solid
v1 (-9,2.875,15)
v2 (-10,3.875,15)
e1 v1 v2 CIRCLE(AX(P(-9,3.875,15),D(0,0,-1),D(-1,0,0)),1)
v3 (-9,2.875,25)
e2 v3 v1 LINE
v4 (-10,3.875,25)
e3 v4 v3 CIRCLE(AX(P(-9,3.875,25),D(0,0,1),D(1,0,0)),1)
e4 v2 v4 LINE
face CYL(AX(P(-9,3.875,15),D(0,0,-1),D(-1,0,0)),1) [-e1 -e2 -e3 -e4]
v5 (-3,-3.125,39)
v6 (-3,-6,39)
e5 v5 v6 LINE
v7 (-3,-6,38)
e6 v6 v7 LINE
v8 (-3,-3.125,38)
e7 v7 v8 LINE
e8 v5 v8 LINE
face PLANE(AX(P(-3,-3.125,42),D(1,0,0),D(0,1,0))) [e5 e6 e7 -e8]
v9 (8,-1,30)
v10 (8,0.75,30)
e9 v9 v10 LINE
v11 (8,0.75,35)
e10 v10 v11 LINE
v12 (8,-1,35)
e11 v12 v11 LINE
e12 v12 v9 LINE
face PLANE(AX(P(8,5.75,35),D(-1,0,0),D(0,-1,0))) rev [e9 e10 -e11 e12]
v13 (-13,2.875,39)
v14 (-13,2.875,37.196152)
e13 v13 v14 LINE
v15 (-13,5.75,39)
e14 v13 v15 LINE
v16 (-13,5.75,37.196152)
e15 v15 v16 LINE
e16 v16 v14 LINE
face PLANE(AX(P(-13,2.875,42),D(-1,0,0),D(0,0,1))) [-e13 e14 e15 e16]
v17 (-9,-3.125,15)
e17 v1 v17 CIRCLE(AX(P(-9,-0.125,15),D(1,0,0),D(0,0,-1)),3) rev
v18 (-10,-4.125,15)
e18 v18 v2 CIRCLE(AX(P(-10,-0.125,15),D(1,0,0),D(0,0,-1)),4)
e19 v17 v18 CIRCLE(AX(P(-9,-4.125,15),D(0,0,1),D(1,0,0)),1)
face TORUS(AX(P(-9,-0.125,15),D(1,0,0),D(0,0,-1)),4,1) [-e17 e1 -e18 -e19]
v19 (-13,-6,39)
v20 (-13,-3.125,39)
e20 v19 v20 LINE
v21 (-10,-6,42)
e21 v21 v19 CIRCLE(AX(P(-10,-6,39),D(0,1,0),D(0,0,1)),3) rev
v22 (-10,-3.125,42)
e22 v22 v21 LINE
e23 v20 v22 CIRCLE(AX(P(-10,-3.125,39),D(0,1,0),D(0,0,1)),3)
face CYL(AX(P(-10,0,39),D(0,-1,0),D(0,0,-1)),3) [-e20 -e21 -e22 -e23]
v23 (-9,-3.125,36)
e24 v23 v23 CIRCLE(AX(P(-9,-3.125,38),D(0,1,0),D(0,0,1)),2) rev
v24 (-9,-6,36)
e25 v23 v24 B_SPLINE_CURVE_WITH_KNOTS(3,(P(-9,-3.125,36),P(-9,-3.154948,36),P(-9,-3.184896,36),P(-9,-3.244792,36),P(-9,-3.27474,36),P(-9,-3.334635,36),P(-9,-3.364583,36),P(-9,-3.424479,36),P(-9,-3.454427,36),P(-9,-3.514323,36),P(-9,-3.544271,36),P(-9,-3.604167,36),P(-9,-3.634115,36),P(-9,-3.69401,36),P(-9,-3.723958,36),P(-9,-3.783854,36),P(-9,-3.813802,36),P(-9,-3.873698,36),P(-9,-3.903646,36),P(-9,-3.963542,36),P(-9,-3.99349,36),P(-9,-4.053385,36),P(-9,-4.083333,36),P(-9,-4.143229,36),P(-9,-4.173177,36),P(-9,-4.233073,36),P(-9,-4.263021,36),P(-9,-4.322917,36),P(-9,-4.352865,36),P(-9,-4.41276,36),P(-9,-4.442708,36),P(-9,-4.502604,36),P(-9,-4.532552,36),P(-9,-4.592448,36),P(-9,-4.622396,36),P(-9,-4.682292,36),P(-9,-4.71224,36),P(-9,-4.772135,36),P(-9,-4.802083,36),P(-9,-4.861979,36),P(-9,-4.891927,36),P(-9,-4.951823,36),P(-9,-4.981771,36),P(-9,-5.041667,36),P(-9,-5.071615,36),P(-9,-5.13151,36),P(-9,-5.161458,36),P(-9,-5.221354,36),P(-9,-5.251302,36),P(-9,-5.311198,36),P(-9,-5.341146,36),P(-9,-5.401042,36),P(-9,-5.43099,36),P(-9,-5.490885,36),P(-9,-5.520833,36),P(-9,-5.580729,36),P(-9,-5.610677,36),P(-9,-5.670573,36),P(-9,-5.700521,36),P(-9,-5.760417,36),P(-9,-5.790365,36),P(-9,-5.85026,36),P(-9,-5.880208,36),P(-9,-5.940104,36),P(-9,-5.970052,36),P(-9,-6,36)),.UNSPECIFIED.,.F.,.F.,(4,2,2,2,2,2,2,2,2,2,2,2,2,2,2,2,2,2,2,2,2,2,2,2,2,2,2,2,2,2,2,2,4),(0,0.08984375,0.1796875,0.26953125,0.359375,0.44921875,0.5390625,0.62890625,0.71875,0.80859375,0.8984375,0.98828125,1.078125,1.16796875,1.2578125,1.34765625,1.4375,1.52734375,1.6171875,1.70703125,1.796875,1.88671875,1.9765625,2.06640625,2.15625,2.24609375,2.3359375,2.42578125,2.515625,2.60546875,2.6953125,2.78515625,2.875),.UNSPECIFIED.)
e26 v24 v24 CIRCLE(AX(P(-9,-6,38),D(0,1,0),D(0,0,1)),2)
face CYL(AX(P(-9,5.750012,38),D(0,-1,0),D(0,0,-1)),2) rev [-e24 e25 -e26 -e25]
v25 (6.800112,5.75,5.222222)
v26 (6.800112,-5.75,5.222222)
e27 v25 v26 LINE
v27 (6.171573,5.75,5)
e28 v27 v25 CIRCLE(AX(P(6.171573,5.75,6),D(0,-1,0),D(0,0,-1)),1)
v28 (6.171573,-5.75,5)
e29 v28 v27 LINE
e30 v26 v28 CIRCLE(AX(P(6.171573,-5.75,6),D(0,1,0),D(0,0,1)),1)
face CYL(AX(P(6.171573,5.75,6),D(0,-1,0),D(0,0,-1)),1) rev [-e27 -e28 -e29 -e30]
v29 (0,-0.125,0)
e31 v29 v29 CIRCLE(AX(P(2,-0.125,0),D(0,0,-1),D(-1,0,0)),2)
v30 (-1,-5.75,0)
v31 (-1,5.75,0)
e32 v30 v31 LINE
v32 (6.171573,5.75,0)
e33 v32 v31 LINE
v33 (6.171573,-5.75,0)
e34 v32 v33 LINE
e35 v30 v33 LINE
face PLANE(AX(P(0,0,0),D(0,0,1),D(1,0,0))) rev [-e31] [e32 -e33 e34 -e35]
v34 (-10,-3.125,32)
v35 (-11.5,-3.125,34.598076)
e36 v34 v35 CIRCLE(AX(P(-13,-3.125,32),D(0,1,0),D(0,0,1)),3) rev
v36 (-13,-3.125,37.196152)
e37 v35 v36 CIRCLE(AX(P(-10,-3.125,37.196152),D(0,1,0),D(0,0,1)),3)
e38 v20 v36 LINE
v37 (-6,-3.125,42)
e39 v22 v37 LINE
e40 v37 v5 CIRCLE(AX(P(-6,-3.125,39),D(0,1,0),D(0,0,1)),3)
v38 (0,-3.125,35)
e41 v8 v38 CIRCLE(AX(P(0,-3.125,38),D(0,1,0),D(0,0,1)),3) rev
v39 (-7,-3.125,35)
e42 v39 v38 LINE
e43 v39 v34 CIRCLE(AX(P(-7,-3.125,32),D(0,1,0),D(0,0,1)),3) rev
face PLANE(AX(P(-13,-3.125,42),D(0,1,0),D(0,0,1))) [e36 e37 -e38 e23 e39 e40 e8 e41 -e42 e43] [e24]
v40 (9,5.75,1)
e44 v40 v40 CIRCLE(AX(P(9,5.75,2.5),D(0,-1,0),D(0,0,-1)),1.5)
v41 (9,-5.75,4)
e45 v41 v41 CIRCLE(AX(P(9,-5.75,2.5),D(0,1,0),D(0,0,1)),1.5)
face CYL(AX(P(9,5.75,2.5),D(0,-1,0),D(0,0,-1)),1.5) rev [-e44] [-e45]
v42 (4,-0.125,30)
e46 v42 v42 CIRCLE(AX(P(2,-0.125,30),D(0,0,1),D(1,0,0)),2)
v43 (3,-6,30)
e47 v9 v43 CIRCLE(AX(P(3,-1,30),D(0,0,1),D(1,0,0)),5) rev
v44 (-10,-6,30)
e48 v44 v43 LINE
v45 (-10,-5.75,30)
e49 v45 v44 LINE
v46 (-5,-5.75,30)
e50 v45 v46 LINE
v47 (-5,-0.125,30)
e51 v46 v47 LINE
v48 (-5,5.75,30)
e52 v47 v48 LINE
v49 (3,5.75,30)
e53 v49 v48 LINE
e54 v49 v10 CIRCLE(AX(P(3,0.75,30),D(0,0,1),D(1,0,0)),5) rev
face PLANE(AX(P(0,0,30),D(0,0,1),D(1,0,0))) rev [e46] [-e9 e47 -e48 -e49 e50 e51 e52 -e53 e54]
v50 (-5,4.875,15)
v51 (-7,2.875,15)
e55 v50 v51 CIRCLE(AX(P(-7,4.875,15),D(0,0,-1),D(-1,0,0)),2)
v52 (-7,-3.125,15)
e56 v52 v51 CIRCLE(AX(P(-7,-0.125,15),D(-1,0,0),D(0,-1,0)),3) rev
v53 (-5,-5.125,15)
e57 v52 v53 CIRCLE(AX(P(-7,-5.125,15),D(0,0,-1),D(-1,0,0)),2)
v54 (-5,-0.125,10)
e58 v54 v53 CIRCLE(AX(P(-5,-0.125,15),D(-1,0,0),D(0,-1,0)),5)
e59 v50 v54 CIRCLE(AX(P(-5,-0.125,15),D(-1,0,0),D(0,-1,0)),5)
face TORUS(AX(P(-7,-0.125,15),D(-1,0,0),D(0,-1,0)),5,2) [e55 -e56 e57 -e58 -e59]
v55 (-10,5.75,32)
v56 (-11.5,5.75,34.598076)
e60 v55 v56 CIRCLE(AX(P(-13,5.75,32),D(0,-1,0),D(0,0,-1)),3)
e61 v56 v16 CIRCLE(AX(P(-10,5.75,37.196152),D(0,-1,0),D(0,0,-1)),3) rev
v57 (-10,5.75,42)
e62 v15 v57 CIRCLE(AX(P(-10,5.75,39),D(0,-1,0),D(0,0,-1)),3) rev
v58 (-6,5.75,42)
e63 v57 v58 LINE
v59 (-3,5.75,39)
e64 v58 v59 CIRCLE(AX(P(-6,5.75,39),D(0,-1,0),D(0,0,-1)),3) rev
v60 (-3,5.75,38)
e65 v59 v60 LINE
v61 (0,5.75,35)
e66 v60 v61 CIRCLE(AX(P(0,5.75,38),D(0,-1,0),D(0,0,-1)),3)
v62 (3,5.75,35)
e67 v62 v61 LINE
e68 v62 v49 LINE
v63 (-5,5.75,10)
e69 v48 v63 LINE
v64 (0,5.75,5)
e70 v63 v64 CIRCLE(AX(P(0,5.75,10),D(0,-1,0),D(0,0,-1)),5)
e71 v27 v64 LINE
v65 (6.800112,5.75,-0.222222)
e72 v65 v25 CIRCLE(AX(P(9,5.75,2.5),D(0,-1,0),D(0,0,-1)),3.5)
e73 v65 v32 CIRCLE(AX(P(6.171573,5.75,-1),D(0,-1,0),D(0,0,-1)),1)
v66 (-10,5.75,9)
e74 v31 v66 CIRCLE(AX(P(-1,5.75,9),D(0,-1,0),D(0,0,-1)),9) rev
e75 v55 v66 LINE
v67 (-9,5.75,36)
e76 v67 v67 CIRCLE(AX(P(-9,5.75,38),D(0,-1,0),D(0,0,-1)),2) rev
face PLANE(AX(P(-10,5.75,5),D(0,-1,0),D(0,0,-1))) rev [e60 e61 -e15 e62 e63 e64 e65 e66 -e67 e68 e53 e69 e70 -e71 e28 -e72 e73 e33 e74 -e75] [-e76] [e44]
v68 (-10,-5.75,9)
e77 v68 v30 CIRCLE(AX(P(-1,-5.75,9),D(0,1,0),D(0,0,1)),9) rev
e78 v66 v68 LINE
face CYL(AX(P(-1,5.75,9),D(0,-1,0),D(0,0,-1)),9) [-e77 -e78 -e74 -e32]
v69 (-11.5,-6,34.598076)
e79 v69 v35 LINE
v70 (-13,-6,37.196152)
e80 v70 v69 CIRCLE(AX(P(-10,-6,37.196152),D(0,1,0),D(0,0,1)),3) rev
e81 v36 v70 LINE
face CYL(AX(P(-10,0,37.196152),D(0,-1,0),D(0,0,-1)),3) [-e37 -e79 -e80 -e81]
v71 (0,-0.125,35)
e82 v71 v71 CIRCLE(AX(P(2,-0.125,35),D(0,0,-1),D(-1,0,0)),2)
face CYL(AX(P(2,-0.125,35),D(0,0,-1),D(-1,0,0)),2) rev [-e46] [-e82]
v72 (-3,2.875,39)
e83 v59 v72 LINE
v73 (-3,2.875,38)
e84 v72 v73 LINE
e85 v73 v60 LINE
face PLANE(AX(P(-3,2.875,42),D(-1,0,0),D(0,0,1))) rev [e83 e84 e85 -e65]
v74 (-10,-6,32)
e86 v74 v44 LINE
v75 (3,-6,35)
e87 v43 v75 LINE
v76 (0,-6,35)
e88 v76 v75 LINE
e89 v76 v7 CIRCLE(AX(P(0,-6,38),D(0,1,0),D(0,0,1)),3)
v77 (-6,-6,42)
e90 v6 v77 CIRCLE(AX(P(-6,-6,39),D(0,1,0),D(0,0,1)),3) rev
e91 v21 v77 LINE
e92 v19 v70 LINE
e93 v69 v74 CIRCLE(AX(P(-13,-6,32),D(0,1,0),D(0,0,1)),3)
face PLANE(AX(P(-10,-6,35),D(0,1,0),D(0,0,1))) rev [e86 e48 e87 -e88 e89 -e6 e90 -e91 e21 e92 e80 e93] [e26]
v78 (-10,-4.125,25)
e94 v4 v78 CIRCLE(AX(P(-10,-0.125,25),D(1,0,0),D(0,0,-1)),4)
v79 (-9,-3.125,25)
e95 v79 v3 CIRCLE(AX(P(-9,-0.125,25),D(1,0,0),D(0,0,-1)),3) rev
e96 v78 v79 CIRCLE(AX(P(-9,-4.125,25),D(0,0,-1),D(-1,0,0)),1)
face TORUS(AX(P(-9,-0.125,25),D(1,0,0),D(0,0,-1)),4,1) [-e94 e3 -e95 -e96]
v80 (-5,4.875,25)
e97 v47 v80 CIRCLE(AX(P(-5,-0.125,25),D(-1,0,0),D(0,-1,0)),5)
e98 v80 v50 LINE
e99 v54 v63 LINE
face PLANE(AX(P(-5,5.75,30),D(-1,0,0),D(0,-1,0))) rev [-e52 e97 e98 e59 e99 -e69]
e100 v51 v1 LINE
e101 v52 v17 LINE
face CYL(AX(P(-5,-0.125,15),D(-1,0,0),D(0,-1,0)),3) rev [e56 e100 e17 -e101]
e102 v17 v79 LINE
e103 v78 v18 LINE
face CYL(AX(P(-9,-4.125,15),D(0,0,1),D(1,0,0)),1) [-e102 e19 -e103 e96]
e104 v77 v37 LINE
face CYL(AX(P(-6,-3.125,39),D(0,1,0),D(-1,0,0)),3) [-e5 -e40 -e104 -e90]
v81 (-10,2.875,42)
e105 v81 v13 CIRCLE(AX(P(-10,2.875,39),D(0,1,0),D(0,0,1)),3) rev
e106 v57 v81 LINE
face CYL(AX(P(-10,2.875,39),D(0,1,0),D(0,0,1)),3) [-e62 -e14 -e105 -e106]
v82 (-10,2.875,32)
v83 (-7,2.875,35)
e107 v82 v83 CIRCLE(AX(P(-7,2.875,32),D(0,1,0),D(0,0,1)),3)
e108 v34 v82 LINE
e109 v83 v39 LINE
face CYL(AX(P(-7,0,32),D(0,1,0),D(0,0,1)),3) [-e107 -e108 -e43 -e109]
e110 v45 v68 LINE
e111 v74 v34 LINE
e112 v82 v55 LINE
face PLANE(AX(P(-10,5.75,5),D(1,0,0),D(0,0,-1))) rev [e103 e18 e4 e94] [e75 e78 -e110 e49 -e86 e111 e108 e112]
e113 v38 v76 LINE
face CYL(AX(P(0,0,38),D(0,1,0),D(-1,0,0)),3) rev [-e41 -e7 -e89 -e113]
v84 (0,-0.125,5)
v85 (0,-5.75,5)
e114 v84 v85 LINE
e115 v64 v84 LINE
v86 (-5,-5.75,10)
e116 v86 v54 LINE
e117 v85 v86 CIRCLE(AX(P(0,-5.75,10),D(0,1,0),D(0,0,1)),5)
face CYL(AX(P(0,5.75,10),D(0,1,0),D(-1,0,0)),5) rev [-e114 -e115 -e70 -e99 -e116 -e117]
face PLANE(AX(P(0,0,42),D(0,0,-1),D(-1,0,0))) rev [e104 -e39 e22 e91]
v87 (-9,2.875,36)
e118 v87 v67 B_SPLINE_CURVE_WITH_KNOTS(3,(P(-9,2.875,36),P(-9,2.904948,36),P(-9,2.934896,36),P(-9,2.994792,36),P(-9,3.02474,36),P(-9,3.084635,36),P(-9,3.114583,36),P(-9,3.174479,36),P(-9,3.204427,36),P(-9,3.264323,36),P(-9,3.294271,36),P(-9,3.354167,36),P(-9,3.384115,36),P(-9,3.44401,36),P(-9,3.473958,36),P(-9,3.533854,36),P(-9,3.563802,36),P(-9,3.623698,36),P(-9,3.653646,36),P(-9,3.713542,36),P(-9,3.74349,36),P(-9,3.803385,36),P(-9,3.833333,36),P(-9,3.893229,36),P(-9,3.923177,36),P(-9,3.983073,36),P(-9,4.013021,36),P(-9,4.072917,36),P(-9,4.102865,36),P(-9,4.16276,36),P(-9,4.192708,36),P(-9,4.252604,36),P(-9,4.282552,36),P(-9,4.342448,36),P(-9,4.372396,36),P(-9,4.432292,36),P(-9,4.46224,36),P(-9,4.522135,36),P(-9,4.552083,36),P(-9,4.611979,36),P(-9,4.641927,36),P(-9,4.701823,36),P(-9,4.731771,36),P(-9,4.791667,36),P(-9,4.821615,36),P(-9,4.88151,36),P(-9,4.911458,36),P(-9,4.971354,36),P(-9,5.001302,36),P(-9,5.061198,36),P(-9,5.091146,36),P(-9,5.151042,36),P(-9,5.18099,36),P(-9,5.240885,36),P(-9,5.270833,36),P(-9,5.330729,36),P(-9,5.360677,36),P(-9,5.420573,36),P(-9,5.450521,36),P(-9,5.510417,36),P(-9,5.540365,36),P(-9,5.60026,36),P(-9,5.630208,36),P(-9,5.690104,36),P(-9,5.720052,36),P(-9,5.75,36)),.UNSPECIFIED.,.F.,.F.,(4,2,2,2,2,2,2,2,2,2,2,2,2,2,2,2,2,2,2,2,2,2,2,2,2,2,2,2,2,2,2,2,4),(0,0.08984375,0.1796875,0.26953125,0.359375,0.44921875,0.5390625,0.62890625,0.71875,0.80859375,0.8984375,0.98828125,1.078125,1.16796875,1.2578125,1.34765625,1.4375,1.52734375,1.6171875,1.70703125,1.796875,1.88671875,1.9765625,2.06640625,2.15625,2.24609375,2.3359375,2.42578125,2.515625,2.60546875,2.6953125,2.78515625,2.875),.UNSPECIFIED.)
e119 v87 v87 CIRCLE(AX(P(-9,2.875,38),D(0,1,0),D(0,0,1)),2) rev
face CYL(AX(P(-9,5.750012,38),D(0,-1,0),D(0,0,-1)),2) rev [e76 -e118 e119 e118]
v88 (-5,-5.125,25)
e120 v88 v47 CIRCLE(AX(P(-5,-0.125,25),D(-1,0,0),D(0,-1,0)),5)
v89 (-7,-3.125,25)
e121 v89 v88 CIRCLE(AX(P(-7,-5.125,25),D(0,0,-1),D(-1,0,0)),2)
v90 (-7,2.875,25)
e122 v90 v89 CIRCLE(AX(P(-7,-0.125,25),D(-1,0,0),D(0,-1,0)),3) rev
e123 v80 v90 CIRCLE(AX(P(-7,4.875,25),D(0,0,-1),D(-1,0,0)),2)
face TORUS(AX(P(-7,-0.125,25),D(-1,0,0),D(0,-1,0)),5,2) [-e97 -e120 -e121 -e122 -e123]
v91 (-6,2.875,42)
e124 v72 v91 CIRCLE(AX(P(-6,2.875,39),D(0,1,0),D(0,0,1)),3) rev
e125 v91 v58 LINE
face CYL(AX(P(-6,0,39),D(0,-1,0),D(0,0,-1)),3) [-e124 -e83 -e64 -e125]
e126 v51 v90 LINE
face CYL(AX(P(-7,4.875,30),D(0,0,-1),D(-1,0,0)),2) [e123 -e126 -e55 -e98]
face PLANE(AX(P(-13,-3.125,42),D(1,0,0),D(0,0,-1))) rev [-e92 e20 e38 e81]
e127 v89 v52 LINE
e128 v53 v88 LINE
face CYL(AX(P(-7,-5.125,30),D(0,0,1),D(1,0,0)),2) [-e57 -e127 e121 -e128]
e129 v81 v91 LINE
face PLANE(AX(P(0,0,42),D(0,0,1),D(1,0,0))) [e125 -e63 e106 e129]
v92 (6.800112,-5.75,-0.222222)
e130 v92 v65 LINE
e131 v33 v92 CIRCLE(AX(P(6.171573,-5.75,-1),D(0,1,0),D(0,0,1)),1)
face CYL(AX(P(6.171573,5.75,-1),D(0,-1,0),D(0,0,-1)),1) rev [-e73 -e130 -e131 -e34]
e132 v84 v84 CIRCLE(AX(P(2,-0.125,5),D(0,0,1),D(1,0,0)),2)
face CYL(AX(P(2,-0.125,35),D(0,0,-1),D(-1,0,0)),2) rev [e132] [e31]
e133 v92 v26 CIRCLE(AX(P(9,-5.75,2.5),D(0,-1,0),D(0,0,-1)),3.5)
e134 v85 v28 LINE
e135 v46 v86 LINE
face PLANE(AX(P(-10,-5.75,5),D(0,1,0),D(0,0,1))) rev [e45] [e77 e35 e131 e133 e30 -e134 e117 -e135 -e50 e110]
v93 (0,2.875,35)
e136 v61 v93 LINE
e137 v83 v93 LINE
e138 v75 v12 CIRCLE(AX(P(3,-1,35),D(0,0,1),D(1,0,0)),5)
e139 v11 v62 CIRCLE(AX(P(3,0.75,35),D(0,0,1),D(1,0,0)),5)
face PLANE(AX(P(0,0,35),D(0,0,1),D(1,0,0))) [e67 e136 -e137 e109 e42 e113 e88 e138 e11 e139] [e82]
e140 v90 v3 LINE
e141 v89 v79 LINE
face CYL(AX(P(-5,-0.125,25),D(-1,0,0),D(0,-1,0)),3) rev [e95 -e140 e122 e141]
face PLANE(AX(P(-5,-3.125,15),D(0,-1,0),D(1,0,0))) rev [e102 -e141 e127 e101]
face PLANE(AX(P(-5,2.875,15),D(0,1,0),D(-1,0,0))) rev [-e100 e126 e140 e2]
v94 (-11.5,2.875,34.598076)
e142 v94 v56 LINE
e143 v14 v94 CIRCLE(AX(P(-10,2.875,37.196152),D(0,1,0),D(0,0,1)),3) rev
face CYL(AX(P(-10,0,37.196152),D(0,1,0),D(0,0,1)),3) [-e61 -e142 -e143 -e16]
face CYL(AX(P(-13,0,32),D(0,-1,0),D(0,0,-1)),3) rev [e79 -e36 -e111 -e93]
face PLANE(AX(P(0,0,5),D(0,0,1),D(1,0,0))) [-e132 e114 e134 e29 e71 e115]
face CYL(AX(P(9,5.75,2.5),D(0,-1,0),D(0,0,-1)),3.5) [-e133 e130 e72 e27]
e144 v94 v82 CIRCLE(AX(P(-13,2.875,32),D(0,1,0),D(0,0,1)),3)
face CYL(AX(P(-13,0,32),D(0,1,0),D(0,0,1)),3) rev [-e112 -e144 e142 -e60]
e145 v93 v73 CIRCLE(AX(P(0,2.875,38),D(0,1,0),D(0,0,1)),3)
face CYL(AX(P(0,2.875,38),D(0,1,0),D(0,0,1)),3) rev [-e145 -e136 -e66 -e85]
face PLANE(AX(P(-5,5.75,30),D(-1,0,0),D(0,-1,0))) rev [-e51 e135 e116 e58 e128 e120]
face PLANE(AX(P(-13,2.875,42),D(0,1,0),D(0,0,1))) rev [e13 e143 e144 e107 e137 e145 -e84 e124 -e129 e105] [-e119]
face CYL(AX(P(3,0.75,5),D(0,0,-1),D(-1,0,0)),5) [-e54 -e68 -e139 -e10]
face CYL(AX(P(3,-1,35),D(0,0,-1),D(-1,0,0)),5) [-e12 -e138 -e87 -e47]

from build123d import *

# Parameters (mm, degrees)
SKETCH1_W               = 20
SKETCH1_H               = 11.5
BOSS_EXTRUDE1_DEPTH     = 5
SKETCH2_W               = 5
SKETCH2_H               = 11.5
BOSS_EXTRUDE2_DEPTH     = 25
SKETCH3_W               = 18
SKETCH3_H               = 11.75
BOSS_EXTRUDE3_DEPTH     = 5
CUT_EXTRUDE1_DEPTH      = 5
CUT_EXTRUDE2_DEPTH      = 33.186953879
CUT_EXTRUDE2_DEPTH_BACK = 33.186953879
SKETCH5_R               = 2
FILLET1_R               = 9
FILLET7_R               = 5
FILLET8_R               = 1
FILLET9_R               = 2
CUT_EXTRUDE4_DEPTH      = 39.173943993
CUT_EXTRUDE4_DEPTH_BACK = 39.173943993
SKETCH10_R              = 1.5
SKETCH10_4_R            = 3.5
SKETCH10_4_R_2          = 1.5
BOSS_EXTRUDE7_DEPTH     = 11.5
FILLET13_R              = 1
FILLET16_R              = 5
SKETCH11_W              = 10
SKETCH11_H              = 2.875
BOSS_EXTRUDE8_DEPTH     = 7
CUT_EXTRUDE5_DEPTH      = 46.508927696
CUT_EXTRUDE5_DEPTH_BACK = 46.508927696
SKETCH12_R              = 2
FILLET17_R              = 3
FILLET18_R              = 3
FILLET19_R              = 3


with BuildPart() as part:
    # Sketch1 → Boss-Extrude1 (new body)
    with BuildSketch(Plane.XY):
        Rectangle(SKETCH1_W, SKETCH1_H)
    extrude(amount=BOSS_EXTRUDE1_DEPTH)

    # Sketch2 → Boss-Extrude2 (add)
    with BuildSketch(Plane.XY.offset(5)):
        with Locations((-7.5, 0)):
            Rectangle(SKETCH2_W, SKETCH2_H)
    extrude(amount=BOSS_EXTRUDE2_DEPTH)

    # Sketch3 → Boss-Extrude3 (add)
    with BuildSketch(Plane.XY.offset(30)):
        with Locations((-1, -0.125)):
            Rectangle(SKETCH3_W, SKETCH3_H)
    extrude(amount=BOSS_EXTRUDE3_DEPTH)

    # Sketch4 → Cut-Extrude1 (cut)
    with BuildSketch(Plane.ZY.offset(10)):
        with BuildLine():
            Line((15, 2.875), (25, 2.875))
            ThreePointArc((25, 2.875), (28, -0.125), (25, -3.125))
            Line((25, -3.125), (15, -3.125))
            ThreePointArc((15, -3.125), (12, -0.125), (15, 2.875))
        make_face()
    extrude(amount=-CUT_EXTRUDE1_DEPTH, mode=Mode.SUBTRACT)

    # Sketch5 → Cut-Extrude2 (cut, two sides: drawn at the far end of the back side and taken through both)
    with BuildSketch(Plane(origin=(0, 0, 30), x_dir=(-1, 0, 0), z_dir=(0, 0, -1)).offset(-CUT_EXTRUDE2_DEPTH_BACK)):
        with Locations((-2, -0.125)):
            Circle(SKETCH5_R)
    extrude(amount=CUT_EXTRUDE2_DEPTH + CUT_EXTRUDE2_DEPTH_BACK, mode=Mode.SUBTRACT)

    # Fillet1
    fillet1_edges = [part.edges().sort_by_distance(p)[0] for p in [
        (-10, 0, 0),
    ]]
    fillet(fillet1_edges, radius=FILLET1_R)

    # Fillet7
    fillet7_edges = [part.edges().sort_by_distance(p)[0] for p in [
        (8, -6, 32.5),
        (8, 5.75, 32.5),
    ]]
    fillet(fillet7_edges, radius=FILLET7_R)

    # Fillet8
    fillet8_edges = [part.edges().sort_by_distance(p)[0] for p in [
        (-10, -0.125, 12),
        (-10, -3.125, 20),
        (-10, -0.125, 28),
        (-10, 2.875, 20),
    ]]
    fillet(fillet8_edges, radius=FILLET8_R)

    # Fillet9
    fillet9_edges = [part.edges().sort_by_distance(p)[0] for p in [
        (-5, -0.125, 12),
        (-5, 2.875, 20),
        (-5, -0.125, 28),
        (-5, -3.125, 20),
    ]]
    fillet(fillet9_edges, radius=FILLET9_R - 0.0001)  # a hair under: the kernel refuses the full size

    # Sketch10 → Cut-Extrude4 (cut, two sides: drawn at the far end of the back side and taken through both)
    with BuildSketch(Plane.XZ.offset(5.75).offset(-CUT_EXTRUDE4_DEPTH_BACK)):
        with Locations((9, 2.5)):
            Circle(SKETCH10_R)
    extrude(amount=CUT_EXTRUDE4_DEPTH + CUT_EXTRUDE4_DEPTH_BACK, mode=Mode.SUBTRACT)

    # Sketch10<4> → Boss-Extrude7 (add)
    with BuildSketch(Plane.XZ.offset(5.75)):
        with Locations((9, 2.5)):
            Circle(SKETCH10_4_R)
        with Locations(Location((9, 2.5, 0), (0, 0, 270))):
            Circle(SKETCH10_4_R_2, mode=Mode.SUBTRACT)
    extrude(amount=-BOSS_EXTRUDE7_DEPTH)

    # Fillet13
    fillet13_edges = [part.edges().sort_by_distance(p)[0] for p in [
        (6.550510257, 0, 0),
        (6.550510257, 0, 5),
    ]]
    fillet(fillet13_edges, radius=FILLET13_R)

    # Fillet16
    fillet16_edges = [part.edges().sort_by_distance(p)[0] for p in [
        (-5, 0, 5),
    ]]
    fillet(fillet16_edges, radius=FILLET16_R - 0.0001)  # a hair under: the kernel refuses the full size

    # Sketch11 → Boss-Extrude8 (add)
    with BuildSketch(Plane.XY.offset(35)):
        with Locations((-8, 4.3125)):
            Rectangle(SKETCH11_W, SKETCH11_H)
        with Locations((-8, -4.5625)):
            Rectangle(SKETCH11_W, SKETCH11_H)
    extrude(amount=BOSS_EXTRUDE8_DEPTH)

    # Sketch12 → Cut-Extrude5 (cut, two sides: drawn at the far end of the back side and taken through both)
    with BuildSketch(Plane(origin=(0, 5.75, 0), x_dir=(1, 0, 0), z_dir=(0, 1, 0)).offset(-CUT_EXTRUDE5_DEPTH_BACK)):
        with Locations(Location((-9, -38, 0), (0, 0, 90))):
            Circle(SKETCH12_R)
    extrude(amount=CUT_EXTRUDE5_DEPTH + CUT_EXTRUDE5_DEPTH_BACK, mode=Mode.SUBTRACT)

    # Fillet17
    fillet17_edges = [part.edges().sort_by_distance(p)[0] for p in [
        (-10, -4.5625, 35),
        (-3, 4.3125, 35),
        (-3, -4.5625, 35),
        (-10, 4.3125, 35),
    ]]
    fillet(fillet17_edges, radius=FILLET17_R - 0.0001)  # a hair under: the kernel refuses the full size
    fillet17_2_edges = [part.edges().sort_by_distance(p)[0] for p in [
        (-13, 4.3125, 42),
        (-3, 4.3125, 42),
        (-3, -4.5625, 42),
        (-13, -4.5625, 42),
    ]]
    fillet(fillet17_2_edges, radius=FILLET17_R)

    # Fillet18
    fillet18_edges = [part.edges().sort_by_distance(p)[0] for p in [
        (-13, 4.3125, 35),
        (-13, -4.5625, 35),
    ]]
    fillet(fillet18_edges, radius=FILLET18_R)

    # Fillet19
    fillet19_edges = [part.edges().sort_by_distance(p)[0] for p in [
        (-10, -0.125, 35),
    ]]
    fillet(fillet19_edges, radius=FILLET19_R - 0.0001)  # a hair under: the kernel refuses the full size


solid = part.part
